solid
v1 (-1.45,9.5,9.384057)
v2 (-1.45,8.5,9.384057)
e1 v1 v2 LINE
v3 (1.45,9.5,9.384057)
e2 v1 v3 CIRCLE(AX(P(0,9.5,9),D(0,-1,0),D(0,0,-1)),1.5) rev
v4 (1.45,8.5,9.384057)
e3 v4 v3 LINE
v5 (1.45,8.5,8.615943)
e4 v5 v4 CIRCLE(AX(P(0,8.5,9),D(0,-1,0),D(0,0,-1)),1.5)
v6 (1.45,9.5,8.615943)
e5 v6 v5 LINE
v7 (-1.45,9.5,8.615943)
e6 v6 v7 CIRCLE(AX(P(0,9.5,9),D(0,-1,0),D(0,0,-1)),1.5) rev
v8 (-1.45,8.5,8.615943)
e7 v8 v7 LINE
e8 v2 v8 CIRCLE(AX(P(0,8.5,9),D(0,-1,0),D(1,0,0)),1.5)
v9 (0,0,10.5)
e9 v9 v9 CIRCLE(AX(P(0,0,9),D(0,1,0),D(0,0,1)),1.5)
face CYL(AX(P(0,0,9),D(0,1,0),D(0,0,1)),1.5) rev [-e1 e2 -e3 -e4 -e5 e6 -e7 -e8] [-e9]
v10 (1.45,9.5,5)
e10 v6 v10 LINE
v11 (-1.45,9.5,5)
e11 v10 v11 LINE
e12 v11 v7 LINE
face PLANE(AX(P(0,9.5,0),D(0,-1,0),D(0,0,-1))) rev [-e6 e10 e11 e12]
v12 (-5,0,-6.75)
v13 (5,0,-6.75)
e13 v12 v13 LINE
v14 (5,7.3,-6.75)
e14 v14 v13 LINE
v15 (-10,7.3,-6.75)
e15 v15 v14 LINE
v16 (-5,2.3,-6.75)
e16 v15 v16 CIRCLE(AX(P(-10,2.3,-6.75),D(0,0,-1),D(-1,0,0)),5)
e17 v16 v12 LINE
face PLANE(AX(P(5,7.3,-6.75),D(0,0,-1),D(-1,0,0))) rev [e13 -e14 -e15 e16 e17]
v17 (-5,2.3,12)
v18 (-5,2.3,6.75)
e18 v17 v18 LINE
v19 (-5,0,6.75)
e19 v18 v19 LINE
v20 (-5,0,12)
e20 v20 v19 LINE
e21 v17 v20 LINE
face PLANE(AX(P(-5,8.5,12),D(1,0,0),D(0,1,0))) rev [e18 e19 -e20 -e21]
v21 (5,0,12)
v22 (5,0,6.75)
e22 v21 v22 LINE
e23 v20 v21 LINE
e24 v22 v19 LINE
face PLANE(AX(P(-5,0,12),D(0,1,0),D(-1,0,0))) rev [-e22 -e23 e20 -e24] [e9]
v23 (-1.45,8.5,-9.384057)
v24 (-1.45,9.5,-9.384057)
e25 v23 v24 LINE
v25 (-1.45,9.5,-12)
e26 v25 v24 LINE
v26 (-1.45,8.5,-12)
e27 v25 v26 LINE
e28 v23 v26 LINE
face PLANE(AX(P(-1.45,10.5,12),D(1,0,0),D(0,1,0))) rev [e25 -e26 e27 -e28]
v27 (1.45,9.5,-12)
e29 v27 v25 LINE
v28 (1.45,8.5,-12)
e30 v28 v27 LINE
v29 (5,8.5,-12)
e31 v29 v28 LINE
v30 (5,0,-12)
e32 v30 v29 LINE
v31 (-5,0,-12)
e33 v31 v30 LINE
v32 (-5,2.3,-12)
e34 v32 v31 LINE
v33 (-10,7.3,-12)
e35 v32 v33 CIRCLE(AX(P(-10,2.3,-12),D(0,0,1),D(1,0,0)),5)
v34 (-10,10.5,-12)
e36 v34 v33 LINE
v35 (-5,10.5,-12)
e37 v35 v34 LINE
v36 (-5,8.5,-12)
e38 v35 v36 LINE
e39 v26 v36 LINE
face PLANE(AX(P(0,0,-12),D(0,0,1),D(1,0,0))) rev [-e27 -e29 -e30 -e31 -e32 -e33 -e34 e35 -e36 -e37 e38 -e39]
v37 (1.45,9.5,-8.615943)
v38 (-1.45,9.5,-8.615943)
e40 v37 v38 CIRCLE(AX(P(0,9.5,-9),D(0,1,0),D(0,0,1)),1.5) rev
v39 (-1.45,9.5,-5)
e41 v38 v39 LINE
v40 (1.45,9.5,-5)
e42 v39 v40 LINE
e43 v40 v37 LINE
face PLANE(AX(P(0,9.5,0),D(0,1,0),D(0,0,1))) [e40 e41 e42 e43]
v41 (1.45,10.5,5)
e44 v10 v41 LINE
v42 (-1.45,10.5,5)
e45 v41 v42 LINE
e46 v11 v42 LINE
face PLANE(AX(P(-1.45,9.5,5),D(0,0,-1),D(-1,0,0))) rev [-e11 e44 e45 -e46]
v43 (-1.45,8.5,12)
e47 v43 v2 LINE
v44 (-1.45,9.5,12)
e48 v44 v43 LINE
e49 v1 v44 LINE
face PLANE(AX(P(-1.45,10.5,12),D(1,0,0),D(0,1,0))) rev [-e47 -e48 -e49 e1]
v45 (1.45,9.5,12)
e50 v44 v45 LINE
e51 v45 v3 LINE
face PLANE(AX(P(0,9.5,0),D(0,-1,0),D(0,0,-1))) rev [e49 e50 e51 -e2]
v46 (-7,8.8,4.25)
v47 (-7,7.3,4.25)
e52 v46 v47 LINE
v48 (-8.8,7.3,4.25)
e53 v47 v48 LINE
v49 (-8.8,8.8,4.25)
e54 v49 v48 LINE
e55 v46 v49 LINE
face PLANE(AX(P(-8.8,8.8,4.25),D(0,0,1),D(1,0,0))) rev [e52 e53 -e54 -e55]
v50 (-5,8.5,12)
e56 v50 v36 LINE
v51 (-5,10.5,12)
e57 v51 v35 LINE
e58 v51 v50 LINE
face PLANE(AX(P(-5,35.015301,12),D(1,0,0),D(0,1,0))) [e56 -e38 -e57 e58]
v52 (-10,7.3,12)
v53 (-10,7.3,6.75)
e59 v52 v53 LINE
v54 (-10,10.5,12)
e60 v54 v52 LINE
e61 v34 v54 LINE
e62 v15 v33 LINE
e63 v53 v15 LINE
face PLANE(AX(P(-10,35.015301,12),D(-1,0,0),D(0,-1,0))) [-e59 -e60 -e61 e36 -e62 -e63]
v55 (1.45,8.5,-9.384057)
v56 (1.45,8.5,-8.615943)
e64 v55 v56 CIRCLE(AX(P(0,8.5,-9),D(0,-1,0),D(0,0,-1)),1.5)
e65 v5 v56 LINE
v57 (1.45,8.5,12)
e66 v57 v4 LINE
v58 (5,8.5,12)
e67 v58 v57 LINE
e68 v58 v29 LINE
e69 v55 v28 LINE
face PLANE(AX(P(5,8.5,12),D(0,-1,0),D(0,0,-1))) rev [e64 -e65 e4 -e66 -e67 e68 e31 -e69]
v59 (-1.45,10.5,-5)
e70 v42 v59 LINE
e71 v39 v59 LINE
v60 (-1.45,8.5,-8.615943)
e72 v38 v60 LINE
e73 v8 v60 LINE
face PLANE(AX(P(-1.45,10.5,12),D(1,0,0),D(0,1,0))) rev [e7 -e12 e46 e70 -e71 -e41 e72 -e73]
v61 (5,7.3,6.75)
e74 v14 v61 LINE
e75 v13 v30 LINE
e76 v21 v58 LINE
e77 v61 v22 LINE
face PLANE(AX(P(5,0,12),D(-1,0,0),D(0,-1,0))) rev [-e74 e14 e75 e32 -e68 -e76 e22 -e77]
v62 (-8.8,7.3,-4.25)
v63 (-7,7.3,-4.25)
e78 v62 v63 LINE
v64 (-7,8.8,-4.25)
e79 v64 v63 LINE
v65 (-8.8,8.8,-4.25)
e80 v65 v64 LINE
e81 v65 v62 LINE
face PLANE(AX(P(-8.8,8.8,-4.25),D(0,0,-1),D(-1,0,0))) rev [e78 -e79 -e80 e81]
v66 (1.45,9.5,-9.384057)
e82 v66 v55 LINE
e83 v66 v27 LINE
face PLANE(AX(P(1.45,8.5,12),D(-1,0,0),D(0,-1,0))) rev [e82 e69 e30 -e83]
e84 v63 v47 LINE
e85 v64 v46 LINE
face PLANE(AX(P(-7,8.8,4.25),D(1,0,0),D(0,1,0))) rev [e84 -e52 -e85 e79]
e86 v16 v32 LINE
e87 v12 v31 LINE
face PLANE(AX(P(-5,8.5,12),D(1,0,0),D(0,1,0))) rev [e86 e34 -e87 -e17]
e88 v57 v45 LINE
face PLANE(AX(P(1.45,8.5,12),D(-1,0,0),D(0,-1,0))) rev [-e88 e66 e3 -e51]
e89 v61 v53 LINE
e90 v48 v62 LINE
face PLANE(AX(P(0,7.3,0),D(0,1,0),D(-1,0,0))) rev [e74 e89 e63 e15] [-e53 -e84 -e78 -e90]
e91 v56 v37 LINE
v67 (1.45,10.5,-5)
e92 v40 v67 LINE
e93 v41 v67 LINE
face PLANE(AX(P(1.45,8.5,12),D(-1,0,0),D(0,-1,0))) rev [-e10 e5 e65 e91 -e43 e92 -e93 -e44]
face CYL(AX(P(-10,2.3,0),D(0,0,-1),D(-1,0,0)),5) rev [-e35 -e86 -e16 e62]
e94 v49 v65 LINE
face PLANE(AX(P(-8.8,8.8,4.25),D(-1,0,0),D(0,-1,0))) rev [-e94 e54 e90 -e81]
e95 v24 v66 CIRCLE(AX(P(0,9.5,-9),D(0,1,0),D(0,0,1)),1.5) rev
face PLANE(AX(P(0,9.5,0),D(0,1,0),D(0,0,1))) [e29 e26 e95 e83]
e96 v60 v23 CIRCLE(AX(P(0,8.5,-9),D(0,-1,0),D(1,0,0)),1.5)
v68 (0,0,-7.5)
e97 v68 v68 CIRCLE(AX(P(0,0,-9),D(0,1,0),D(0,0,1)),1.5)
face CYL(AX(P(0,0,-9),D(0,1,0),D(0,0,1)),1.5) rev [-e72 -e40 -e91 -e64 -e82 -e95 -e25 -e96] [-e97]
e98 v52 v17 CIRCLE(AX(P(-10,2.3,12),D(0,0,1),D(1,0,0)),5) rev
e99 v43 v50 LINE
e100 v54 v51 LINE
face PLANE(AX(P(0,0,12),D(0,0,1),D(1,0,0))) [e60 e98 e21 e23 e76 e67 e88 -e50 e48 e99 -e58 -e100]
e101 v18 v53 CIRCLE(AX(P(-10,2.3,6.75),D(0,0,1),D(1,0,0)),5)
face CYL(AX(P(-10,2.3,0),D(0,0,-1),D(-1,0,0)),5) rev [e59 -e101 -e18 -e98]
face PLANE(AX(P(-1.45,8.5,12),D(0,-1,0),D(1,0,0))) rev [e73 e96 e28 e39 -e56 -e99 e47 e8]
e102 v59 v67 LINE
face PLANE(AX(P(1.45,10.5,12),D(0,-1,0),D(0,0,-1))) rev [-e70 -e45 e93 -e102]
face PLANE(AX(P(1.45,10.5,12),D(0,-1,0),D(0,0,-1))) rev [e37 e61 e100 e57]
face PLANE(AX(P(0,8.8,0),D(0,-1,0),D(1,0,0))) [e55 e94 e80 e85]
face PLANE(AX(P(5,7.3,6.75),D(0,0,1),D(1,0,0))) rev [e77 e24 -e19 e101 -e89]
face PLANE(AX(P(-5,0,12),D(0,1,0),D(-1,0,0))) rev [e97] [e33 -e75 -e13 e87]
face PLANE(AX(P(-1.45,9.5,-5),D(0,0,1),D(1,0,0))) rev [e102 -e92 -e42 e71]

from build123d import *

# Parameters (mm, degrees)
MAIN_DEPTH                      = 12
SKETCH2_R                       = 1.5
HOLEMAKERBEAMFIX_DEPTH          = 17.710774967
SKETCH3_W                       = 10
SKETCH3_H                       = 13.5
MAINCONNECTORHOLE_DEPTH         = 7.3
SKETCH4_W                       = 5
SKETCH4_H                       = 24
CONNECTORSUPPORTEXTENSION_DEPTH = 3.2
SKETCH5_W                       = 1.8
SKETCH5_H                       = 8.5
CONNECTORRAILHOLE_DEPTH         = 1.5
SKETCH6_W                       = 2.9
SKETCH6_H                       = 7
CUT_EXTRUDE4_DEPTH              = 1
FILLET3_R                       = 5


with BuildPart() as part:
    # Sketch1 → Main (new, symmetric)
    with BuildSketch(Plane.XY):
        Polygon((-5, 8.5), (-5, 0), (5, 0), (5, 8.5), (1.45, 8.5), (1.45, 10.5), (-1.45, 10.5), (-1.45, 8.5), align=None)
    extrude(amount=MAIN_DEPTH, both=True)

    # Sketch2 → HoleMakerBeamFix (cut, through all)
    with BuildSketch(Plane(origin=(0, 10.5, 0), x_dir=(1, 0, 0), z_dir=(0, 1, 0))):
        with Locations(Location((0, -9, 0), (0, 0, 270))):
            Circle(SKETCH2_R)
        with Locations(Location((0, 9, 0), (0, 0, 270))):
            Circle(SKETCH2_R)
    extrude(amount=-HOLEMAKERBEAMFIX_DEPTH, mode=Mode.SUBTRACT)

    # Sketch3 → MainConnectorHole (cut)
    with BuildSketch(Plane(origin=(0, 0, 0), x_dir=(-1, 0, 0), z_dir=(0, -1, 0))):
        Rectangle(SKETCH3_W, SKETCH3_H)
    extrude(amount=-MAINCONNECTORHOLE_DEPTH, mode=Mode.SUBTRACT)

    # Sketch4 → ConnectorSupportExtension (add)
    with BuildSketch(Plane(origin=(0, 7.3, 0), x_dir=(-1, 0, 0), z_dir=(0, -1, 0))):
        with Locations((7.5, 0)):
            Rectangle(SKETCH4_W, SKETCH4_H)
    extrude(amount=-CONNECTORSUPPORTEXTENSION_DEPTH)

    # Sketch5 → ConnectorRailHole (cut)
    with BuildSketch(Plane(origin=(0, 7.3, 0), x_dir=(-1, 0, 0), z_dir=(0, -1, 0))):
        with Locations((7.9, 0)):
            Rectangle(SKETCH5_W, SKETCH5_H)
    extrude(amount=-CONNECTORRAILHOLE_DEPTH, mode=Mode.SUBTRACT)

    # Sketch6 → Cut-Extrude4 (cut)
    with BuildSketch(Plane(origin=(0, 10.5, 0), x_dir=(1, 0, 0), z_dir=(0, 1, 0))):
        with Locations((0, 8.5)):
            Rectangle(SKETCH6_W, SKETCH6_H)
        with Locations((0, -8.5)):
            Rectangle(SKETCH6_W, SKETCH6_H)
    extrude(amount=-CUT_EXTRUDE4_DEPTH, mode=Mode.SUBTRACT)

    # Fillet3
    fillet3_edges = [part.edges().sort_by_distance(p)[0] for p in [
        (-5, 7.3, -9.375),
        (-5, 7.3, 9.375),
    ]]
    fillet(fillet3_edges, radius=FILLET3_R - 0.0001)  # a hair under: the kernel refuses the full size


solid = part.part
